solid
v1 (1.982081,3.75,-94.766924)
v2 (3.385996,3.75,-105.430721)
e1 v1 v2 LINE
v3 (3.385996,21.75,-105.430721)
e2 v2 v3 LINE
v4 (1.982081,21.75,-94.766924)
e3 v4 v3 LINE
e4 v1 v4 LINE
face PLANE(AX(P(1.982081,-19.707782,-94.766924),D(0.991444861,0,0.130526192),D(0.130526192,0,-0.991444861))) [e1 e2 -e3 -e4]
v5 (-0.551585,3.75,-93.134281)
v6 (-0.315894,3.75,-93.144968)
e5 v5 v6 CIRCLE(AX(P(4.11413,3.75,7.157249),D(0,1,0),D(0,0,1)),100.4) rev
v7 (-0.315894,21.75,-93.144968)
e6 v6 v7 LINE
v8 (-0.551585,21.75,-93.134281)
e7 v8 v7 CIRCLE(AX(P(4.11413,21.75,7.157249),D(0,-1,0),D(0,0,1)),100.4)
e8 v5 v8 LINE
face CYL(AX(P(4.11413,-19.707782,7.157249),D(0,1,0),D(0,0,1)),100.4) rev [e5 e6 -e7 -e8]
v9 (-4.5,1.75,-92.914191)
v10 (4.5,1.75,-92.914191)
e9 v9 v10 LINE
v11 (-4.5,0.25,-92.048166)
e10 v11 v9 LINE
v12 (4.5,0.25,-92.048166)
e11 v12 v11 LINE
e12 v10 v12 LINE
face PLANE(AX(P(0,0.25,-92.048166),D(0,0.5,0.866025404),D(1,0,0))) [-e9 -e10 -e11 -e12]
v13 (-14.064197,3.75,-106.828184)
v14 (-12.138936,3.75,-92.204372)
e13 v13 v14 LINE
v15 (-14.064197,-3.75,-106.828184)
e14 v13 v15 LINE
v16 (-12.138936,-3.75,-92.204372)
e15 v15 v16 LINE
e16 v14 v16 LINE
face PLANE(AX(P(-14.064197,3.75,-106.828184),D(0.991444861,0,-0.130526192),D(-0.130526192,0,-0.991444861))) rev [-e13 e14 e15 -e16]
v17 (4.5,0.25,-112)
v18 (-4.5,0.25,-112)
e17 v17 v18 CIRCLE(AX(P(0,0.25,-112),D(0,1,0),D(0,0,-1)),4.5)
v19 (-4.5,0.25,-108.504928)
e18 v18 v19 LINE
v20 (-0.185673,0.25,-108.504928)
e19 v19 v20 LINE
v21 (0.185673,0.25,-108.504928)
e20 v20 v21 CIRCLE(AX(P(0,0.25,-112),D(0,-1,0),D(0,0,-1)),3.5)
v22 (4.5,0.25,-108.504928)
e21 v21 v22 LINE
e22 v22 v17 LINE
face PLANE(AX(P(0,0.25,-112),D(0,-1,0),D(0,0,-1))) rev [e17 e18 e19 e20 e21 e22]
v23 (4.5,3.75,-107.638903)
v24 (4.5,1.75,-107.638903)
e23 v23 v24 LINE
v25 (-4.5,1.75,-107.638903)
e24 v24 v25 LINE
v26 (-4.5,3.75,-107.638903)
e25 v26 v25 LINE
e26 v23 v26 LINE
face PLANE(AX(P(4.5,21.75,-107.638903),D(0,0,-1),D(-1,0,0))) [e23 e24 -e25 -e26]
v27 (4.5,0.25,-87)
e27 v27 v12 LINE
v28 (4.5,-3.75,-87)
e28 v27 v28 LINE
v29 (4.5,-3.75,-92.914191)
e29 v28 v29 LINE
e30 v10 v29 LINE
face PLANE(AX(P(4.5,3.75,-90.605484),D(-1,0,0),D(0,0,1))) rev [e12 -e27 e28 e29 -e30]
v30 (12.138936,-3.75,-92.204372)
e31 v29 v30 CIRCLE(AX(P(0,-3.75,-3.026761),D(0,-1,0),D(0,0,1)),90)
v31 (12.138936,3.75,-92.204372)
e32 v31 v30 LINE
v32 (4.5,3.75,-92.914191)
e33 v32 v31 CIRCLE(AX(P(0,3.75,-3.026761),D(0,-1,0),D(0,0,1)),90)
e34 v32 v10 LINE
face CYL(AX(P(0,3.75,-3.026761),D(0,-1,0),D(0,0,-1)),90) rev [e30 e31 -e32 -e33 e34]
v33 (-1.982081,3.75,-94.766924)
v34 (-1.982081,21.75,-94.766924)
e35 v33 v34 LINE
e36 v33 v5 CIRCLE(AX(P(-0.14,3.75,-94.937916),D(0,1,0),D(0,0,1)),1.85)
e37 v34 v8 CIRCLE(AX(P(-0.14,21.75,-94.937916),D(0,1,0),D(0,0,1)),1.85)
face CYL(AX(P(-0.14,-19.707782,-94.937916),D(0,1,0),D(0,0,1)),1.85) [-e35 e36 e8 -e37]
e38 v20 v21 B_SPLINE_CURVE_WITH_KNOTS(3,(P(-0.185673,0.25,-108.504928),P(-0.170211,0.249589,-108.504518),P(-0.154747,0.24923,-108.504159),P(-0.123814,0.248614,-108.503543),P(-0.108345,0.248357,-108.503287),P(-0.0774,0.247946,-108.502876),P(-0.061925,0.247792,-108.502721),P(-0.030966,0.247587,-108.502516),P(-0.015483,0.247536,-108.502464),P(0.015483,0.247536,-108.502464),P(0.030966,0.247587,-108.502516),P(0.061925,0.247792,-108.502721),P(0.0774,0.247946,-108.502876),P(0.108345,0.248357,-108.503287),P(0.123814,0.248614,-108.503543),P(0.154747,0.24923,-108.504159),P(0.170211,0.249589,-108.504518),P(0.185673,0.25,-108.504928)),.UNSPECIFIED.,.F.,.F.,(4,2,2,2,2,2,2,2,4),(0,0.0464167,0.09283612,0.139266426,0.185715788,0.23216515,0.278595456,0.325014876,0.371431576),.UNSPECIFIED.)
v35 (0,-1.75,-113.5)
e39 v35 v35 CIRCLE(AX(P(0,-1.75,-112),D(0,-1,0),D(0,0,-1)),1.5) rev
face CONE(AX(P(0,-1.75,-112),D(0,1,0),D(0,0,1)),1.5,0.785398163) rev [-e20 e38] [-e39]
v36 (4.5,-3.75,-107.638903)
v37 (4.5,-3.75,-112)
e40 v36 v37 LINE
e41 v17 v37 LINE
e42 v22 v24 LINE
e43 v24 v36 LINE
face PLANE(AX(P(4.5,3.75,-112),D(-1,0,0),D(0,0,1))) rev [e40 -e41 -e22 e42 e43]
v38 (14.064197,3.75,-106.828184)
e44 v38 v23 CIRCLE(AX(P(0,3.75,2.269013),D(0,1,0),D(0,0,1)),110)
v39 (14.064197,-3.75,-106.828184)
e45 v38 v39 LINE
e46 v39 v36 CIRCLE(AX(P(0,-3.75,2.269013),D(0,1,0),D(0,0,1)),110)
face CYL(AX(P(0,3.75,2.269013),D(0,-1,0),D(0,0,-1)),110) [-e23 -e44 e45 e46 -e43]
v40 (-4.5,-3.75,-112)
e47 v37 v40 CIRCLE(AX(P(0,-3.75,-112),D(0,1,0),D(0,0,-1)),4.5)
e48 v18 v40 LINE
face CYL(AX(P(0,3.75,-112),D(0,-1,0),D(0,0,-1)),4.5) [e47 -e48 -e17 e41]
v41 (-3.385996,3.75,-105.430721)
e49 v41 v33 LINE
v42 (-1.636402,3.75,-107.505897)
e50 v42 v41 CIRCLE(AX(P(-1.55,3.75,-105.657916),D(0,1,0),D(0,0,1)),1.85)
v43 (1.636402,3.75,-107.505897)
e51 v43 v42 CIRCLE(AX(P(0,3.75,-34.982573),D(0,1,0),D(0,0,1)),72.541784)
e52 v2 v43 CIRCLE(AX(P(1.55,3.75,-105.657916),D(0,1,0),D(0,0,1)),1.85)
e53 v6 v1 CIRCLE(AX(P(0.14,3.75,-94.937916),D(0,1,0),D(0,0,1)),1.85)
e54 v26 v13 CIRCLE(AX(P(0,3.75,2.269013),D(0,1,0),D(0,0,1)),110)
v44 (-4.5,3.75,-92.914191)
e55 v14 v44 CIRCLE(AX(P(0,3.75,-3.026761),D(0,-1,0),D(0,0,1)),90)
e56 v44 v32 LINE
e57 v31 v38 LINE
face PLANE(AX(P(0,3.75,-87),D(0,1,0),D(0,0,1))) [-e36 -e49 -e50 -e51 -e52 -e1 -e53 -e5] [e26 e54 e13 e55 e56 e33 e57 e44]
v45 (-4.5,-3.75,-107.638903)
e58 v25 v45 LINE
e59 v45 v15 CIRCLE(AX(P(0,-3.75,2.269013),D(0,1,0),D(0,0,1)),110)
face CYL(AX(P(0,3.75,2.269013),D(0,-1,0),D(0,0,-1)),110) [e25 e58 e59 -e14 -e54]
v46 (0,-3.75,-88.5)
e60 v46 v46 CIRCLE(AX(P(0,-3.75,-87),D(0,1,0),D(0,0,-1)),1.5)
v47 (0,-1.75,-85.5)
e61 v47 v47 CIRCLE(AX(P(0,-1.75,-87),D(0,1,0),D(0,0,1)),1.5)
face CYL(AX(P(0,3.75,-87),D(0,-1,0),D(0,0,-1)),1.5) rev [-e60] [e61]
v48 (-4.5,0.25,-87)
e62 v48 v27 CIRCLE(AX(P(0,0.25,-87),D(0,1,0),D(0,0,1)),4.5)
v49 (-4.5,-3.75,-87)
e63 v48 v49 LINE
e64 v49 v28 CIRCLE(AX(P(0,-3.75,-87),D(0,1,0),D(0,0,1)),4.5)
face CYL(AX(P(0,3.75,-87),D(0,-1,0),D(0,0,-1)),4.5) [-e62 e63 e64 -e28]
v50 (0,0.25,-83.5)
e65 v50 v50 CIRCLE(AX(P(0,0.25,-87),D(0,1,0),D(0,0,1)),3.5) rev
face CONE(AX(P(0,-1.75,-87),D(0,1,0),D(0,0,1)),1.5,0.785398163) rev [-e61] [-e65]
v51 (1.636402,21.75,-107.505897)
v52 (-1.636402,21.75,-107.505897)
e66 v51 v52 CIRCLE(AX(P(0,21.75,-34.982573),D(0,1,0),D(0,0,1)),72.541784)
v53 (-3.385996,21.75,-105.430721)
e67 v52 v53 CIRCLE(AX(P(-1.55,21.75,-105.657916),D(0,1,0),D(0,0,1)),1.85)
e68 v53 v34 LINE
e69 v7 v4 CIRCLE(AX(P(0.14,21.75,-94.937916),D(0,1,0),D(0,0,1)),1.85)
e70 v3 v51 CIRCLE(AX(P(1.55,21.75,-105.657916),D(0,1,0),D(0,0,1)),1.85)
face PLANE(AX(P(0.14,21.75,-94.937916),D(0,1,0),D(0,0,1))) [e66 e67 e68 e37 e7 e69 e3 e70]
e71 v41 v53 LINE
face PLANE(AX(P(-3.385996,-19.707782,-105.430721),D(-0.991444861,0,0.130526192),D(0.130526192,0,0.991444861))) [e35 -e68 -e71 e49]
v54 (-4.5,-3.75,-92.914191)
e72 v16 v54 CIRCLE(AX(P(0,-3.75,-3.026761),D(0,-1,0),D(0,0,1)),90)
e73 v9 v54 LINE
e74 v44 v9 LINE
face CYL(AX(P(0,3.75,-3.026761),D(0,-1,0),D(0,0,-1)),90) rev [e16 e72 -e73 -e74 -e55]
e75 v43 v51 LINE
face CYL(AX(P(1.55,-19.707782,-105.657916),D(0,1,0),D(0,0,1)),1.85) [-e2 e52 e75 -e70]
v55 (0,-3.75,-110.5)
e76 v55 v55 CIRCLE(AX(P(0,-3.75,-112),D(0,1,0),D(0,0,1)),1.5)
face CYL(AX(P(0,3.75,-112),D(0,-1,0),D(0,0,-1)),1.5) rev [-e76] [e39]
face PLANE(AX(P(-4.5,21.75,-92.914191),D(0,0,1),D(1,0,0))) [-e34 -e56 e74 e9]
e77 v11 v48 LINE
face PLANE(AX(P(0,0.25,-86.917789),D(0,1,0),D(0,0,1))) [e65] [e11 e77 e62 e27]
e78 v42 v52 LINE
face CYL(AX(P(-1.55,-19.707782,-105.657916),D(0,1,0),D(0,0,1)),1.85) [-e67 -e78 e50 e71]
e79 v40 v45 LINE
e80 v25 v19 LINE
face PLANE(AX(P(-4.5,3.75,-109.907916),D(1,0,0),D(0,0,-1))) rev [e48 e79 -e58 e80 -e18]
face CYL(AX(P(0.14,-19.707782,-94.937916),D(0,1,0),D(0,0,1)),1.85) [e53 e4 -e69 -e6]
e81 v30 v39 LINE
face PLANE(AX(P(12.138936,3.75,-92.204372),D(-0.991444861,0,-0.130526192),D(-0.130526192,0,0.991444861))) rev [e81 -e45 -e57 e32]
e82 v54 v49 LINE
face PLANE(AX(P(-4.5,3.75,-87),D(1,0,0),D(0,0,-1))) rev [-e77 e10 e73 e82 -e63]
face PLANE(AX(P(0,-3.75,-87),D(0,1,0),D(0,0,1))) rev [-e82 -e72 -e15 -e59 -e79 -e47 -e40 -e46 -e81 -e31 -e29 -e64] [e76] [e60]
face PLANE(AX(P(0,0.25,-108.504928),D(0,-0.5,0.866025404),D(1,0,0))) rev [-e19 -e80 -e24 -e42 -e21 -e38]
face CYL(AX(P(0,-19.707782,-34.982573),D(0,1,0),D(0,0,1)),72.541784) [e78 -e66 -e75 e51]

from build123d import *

# Parameters (mm, degrees)
SKETCH1_R                = 1.5
BOSS_EXTRUDE1_DEPTH      = 3.75
BOSS_EXTRUDE2_DEPTH      = 18
BOSS_EXTRUDE2_DEPTH_BACK = 7.5
CUT_EXTRUDE1_DEPTH       = 119.718371128
CUT_EXTRUDE1_DEPTH_BACK  = 3.5
SKETCH4_R                = 1.5
CHAMFER1_SIZE            = 2


with BuildPart() as part:
    # Sketch1 → Boss-Extrude1 (new, symmetric)
    with BuildSketch(Plane(origin=(0, 0, 0), x_dir=(1, 0, 0), z_dir=(0, 1, 0))):
        with BuildLine():
            Line((-14.064197212, 106.828183813), (-12.138935876, 92.204372108))
            ThreePointArc((-12.138935876, 92.204372108), (-8.327034738, 92.640714043), (-4.5, 92.914191088))
            Line((-4.5, 92.914191088), (-4.5, 90.60548378))
            Line((-4.5, 90.60548378), (-4.5, 89.092083998))
            Line((-4.5, 89.092083998), (-4.5, 87))
            ThreePointArc((-4.5, 87), (0, 82.5), (4.5, 87))
            Line((4.5, 87), (4.5, 89.092083998))
            Line((4.5, 89.092083998), (4.5, 90.60548378))
            Line((4.5, 90.60548378), (4.5, 92.914191088))
            ThreePointArc((4.5, 92.914191088), (8.327034738, 92.640714043), (12.138935876, 92.204372108))
            Line((12.138935876, 92.204372108), (14.064197212, 106.828183813))
            ThreePointArc((14.064197212, 106.828183813), (9.290945642, 107.337913445), (4.5, 107.638902983))
            Line((4.5, 107.638902983), (4.5, 109.907916002))
            Line((4.5, 109.907916002), (4.5, 112))
            ThreePointArc((4.5, 112), (0, 116.5), (-4.5, 112))
            Line((-4.5, 112), (-4.5, 109.907916002))
            Line((-4.5, 109.907916002), (-4.5, 107.638902983))
            ThreePointArc((-4.5, 107.638902983), (-9.290945642, 107.337913445), (-14.064197212, 106.828183813))
        make_face()
        with Locations(Location((0, 112, 0), (0, 0, 270))):
            Circle(SKETCH1_R, mode=Mode.SUBTRACT)
        with Locations(Location((0, 87, 0), (0, 0, 90))):
            Circle(SKETCH1_R, mode=Mode.SUBTRACT)
    extrude(amount=BOSS_EXTRUDE1_DEPTH, both=True)

    # Sketch3 → Boss-Extrude2 (add, two sides: drawn at the far end of the back side and taken through both)
    with BuildSketch(Plane(origin=(0, 3.75, 0), x_dir=(1, 0, 0), z_dir=(0, 1, 0)).offset(-BOSS_EXTRUDE2_DEPTH_BACK)):
        with BuildLine():
            Line((1.982080861, 94.766924481), (3.385996272, 105.430720736))
            ThreePointArc((3.385996272, 105.430720736), (2.964387866, 106.850395337), (1.636401853, 107.505897258))
            ThreePointArc((1.636401853, 107.505897258), (0, 107.524356631), (-1.636401853, 107.505897258))
            ThreePointArc((-1.636401853, 107.505897258), (-2.964387866, 106.850395337), (-3.385996272, 105.430720736))
            Line((-3.385996272, 105.430720736), (-1.982080861, 94.766924481))
            ThreePointArc((-1.982080861, 94.766924481), (-1.531449923, 93.718749438), (-0.551584549, 93.134281295))
            ThreePointArc((-0.551584549, 93.134281295), (-0.433742315, 93.139694116), (-0.315893802, 93.144968474))
            ThreePointArc((-0.315893802, 93.144968474), (1.206800808, 93.426480911), (1.982080861, 94.766924481))
        make_face()
    extrude(amount=BOSS_EXTRUDE2_DEPTH + BOSS_EXTRUDE2_DEPTH_BACK)

    # Sketch4 → Cut-Extrude1 (cut, two sides: drawn at the far end of the back side and taken through both)
    # profile 1 of 2: a face of its own
    with BuildSketch(Plane(origin=(0, 3.75, 0), x_dir=(1, 0, 0), z_dir=(0, 1, 0)).offset(-CUT_EXTRUDE1_DEPTH_BACK)):
        with BuildLine():
            Line((-4.5, 91.393652938), (-4.5, 87.032555921))
            ThreePointArc((-4.5, 87.032555921), (0, 82.41632562), (4.5, 87.032555921))
            Line((4.5, 87.032555921), (4.5, 91.393652938))
            Line((4.5, 91.393652938), (4.5, 92.914191088))
            Line((4.5, 92.914191088), (-4.5, 92.914191088))
            Line((-4.5, 92.914191088), (-4.5, 91.393652938))
        make_face()
        with Locations(Location((0, 87, 0), (0, 0, 90))):
            Circle(SKETCH4_R, mode=Mode.SUBTRACT)
    # profile 2 of 2: a face of its own
    with BuildSketch(Plane(origin=(0, 3.75, 0), x_dir=(1, 0, 0), z_dir=(0, 1, 0)).offset(-CUT_EXTRUDE1_DEPTH_BACK)):
        with BuildLine():
            Line((4.5, 107.638902983), (-4.5, 107.638902983))
            Line((-4.5, 107.638902983), (-4.5, 112))
            ThreePointArc((-4.5, 112), (0, 116.5), (4.5, 112))
            Line((4.5, 112), (4.5, 107.638902983))
        make_face()
        with Locations(Location((0, 112, 0), (0, 0, 270))):
            Circle(SKETCH4_R, mode=Mode.SUBTRACT)
    extrude(amount=CUT_EXTRUDE1_DEPTH + CUT_EXTRUDE1_DEPTH_BACK, mode=Mode.SUBTRACT)

    # Chamfer1
    chamfer1_edges = [part.edges().sort_by_distance(p)[0] for p in [
        (0, 0.25, -85.5),
        (0, 0.25, -113.5),
    ]]
    chamfer(chamfer1_edges, length=CHAMFER1_SIZE)

    # Chamfer2
    # the kernel refuses this chamfer: 1.5, 0.866025404 mm, written as the material it adds along each edge
    with BuildSketch(Plane(origin=(4.5, 0.25, -107.638902983), x_dir=(-1.576335496707441e-15, -0.057893862402670165, -0.9983227437537927), z_dir=(-1, 0, 0))) as chamfer2_piece_1:
        with BuildLine():
            Line((0.897530793, 0), (-0.119798729, -1.547621671))
            Line((-0.119798729, -1.547621671), (-0.149748412, -1.545884855))
            ThreePointArc((-0.149748412, -1.545884855), (-0.074874206, -0.772942428), (-0.029949682, 0.001736816))
            Line((-0.029949682, 0.001736816), (0.001736816, 0.029949682))
            ThreePointArc((0.001736816, 0.029949682), (0.448998086, 0.004012497), (0.899267609, 0.029949682))
            Line((0.899267609, 0.029949682), (0.897530793, 0))
        make_face()
    extrude(amount=9)
    with BuildSketch(Plane(origin=(4.5, 0.25, -92.914191088), x_dir=(0, 0.9998132206222078, -0.019326765612701434), z_dir=(-1, 0, 0))) as chamfer2_piece_2_section:
        with BuildLine():
            Line((1.552251453, 0), (-0.069269092, -0.894853797))
            Line((-0.069269092, -0.894853797), (-0.099263488, -0.894273994))
            ThreePointArc((-0.099263488, -0.894273994), (-0.038653033, -0.447349219), (-0.029994397, 0.000579803))
            Line((-0.029994397, 0.000579803), (0.000579803, 0.029994397))
            ThreePointArc((0.000579803, 0.029994397), (0.776415628, 0.014997198), (1.552831256, 0.029994397))
            Line((1.552831256, 0.029994397), (1.552251453, 0))
        make_face()
    chamfer2_piece_2 = extrude(amount=9, mode=Mode.PRIVATE)
    chamfer2_piece_2 = chamfer2_piece_2 & Plane(origin=(0, 0.749739916, -3.026761488), x_dir=(-0.13487706529406074, 0, -0.9908623402156638), z_dir=(0, 1, 0)) * Cylinder(90, 25, mode=Mode.PRIVATE)
    add(chamfer2_piece_2)


solid = part.part
